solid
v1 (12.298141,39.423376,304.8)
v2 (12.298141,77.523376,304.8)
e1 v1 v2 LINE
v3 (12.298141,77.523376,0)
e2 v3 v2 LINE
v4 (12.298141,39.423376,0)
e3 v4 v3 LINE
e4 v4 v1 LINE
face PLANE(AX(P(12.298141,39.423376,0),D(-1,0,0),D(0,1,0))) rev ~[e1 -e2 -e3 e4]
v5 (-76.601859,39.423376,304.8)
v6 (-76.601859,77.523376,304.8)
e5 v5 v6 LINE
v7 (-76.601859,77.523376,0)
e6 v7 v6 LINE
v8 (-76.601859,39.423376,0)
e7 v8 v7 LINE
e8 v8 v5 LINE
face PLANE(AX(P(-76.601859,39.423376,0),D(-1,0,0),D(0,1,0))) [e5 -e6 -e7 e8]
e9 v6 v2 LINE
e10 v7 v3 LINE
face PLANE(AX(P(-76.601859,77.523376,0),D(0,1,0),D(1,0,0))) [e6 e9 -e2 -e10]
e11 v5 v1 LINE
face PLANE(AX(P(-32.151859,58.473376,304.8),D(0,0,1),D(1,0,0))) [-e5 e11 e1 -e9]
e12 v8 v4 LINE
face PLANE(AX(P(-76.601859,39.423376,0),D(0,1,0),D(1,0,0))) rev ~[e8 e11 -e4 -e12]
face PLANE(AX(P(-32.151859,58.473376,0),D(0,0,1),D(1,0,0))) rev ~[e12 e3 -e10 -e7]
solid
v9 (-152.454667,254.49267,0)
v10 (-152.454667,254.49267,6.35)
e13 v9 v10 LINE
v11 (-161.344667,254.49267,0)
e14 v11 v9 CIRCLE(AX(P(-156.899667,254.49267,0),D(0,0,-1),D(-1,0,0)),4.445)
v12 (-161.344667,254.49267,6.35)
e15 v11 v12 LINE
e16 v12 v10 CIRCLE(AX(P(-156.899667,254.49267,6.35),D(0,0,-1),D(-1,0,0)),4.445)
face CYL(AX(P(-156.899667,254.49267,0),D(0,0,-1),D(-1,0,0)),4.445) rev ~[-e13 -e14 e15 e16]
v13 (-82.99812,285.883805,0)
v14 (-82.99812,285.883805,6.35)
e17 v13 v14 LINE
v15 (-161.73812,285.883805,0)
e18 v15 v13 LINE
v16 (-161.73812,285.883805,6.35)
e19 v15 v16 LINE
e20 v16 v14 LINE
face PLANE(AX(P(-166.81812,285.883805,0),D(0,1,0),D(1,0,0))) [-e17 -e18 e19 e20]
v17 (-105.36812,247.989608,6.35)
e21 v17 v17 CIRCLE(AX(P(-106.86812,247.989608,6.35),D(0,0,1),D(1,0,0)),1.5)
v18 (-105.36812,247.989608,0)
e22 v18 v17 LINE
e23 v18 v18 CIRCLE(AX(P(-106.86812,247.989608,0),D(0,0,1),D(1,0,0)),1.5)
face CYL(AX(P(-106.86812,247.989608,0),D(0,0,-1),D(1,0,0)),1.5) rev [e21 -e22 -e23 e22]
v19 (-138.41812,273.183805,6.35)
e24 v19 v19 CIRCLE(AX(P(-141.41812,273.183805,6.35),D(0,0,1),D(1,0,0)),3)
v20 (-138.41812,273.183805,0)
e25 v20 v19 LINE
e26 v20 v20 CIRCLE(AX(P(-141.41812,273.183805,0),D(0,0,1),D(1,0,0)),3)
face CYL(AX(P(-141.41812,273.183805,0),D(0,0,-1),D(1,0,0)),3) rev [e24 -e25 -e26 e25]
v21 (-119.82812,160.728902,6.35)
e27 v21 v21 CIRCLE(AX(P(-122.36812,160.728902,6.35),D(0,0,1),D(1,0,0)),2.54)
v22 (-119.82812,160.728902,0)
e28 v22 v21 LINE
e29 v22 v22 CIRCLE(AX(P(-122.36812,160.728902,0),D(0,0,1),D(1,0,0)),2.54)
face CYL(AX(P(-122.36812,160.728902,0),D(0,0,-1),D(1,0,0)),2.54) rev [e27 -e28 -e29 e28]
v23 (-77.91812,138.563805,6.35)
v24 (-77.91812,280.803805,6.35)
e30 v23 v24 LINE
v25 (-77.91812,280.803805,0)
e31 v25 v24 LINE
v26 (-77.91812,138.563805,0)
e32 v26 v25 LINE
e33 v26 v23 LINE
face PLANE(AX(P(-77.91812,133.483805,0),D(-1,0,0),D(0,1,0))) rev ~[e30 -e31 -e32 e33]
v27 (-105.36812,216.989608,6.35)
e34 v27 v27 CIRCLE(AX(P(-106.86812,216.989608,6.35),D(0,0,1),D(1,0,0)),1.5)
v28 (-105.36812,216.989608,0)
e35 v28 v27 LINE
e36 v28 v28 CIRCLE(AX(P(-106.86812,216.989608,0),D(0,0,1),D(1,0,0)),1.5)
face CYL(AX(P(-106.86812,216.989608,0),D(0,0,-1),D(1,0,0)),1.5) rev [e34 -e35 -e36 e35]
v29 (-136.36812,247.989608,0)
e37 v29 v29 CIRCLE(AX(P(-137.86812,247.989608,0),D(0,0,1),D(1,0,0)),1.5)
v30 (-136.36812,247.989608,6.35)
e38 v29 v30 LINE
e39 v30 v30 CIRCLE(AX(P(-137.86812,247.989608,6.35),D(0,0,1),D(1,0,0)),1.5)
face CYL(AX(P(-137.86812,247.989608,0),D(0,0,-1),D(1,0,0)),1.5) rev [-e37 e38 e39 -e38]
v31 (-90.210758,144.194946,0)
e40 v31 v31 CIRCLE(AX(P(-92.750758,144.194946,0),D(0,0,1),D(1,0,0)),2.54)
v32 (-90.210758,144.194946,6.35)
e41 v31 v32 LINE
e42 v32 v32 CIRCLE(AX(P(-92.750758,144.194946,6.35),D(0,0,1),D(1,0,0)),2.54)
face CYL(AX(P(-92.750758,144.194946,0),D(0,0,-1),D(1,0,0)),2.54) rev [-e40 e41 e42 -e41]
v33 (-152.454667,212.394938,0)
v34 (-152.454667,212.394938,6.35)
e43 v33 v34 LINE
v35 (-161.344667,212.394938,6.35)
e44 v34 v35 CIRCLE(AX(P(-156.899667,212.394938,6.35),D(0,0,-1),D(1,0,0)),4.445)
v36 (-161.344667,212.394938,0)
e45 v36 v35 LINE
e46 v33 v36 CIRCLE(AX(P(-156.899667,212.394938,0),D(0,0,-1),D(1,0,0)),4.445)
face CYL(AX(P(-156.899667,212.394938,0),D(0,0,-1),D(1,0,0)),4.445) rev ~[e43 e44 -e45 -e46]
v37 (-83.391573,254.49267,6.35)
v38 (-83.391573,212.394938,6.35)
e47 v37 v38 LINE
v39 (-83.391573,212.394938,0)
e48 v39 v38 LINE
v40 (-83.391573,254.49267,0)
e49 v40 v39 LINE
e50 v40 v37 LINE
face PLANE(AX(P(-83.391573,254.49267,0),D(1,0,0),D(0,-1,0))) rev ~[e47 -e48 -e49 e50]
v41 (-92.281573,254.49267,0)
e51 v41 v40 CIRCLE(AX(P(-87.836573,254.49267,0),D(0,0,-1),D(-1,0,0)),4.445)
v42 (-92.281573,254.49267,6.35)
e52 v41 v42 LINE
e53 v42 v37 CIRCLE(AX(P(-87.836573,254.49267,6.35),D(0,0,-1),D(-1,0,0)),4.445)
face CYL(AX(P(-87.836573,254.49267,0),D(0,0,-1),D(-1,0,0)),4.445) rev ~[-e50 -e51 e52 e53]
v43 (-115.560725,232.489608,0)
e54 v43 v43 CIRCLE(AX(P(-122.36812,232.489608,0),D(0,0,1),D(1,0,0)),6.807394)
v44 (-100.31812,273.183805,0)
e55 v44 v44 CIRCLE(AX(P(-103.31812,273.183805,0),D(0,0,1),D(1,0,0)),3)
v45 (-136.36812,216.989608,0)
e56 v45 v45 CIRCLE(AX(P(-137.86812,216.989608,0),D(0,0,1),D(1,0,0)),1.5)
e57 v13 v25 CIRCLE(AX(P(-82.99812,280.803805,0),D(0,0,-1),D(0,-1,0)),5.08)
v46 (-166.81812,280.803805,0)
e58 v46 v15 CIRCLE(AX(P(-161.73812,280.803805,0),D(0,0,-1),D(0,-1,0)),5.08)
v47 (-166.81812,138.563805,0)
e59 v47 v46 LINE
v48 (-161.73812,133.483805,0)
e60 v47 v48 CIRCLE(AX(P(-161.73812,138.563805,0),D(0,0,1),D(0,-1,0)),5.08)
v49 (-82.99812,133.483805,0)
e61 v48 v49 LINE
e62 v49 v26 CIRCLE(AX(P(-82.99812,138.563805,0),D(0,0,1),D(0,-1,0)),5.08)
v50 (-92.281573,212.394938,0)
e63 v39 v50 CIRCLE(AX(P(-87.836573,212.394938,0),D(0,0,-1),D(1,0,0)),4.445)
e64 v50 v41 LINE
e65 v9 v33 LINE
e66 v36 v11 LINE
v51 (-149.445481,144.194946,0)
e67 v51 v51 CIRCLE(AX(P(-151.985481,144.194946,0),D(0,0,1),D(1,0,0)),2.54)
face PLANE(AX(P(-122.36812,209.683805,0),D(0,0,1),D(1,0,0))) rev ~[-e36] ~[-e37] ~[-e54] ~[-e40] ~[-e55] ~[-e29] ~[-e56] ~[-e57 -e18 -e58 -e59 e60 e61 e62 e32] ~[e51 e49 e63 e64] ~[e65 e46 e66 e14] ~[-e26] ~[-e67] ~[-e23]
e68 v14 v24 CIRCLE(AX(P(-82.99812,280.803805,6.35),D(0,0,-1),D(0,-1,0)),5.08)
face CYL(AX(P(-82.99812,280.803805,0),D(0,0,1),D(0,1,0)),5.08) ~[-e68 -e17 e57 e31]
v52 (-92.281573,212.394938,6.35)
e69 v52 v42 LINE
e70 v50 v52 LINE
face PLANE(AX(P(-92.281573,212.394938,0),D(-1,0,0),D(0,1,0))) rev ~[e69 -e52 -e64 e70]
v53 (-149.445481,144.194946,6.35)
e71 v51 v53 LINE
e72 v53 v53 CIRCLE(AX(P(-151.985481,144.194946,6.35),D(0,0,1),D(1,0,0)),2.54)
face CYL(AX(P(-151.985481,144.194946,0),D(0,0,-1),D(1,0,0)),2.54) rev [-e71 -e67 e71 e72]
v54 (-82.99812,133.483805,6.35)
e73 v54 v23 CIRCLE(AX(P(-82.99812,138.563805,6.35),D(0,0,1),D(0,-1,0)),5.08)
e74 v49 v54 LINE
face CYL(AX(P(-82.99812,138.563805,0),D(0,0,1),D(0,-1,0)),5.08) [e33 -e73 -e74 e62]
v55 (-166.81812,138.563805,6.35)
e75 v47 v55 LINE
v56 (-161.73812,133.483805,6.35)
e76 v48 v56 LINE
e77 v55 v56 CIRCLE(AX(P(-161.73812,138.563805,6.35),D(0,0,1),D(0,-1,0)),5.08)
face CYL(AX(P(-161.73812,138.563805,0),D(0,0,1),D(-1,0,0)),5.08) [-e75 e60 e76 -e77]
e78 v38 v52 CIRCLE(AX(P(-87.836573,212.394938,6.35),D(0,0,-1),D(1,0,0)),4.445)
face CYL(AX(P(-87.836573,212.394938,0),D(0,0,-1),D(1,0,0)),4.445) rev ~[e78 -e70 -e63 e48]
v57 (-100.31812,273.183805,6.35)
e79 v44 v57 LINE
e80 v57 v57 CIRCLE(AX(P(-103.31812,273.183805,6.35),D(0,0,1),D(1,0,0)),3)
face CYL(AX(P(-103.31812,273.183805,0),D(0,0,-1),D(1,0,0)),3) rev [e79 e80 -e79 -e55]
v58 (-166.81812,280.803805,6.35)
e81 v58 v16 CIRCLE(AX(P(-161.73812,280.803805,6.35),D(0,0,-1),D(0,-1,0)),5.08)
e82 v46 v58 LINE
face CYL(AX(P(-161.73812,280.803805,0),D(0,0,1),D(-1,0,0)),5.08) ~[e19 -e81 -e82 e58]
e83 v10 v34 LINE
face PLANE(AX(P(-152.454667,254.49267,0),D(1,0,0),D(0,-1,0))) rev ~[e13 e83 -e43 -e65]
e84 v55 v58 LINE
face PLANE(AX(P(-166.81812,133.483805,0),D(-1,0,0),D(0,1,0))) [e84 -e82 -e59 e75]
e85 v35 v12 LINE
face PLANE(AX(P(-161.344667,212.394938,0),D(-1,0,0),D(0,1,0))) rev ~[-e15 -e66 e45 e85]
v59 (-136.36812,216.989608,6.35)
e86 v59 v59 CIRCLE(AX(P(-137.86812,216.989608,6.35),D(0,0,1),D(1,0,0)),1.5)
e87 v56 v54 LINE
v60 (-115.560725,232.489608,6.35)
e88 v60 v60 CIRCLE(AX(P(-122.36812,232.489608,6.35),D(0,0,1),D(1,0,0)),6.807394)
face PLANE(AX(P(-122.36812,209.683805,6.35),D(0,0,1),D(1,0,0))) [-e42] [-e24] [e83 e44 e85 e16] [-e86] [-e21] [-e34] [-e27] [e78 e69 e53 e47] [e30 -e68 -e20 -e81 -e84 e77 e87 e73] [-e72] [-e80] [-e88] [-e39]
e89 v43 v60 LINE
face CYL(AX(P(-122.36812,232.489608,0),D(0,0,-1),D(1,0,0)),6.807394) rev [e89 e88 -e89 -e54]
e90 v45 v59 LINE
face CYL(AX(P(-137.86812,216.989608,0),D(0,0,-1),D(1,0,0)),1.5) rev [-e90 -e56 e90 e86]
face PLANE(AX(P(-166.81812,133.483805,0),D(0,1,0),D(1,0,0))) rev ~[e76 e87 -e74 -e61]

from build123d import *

# Parameters (mm, degrees)
F0_W     = 88.9
F0_H     = 152.4
F0_R     = 2.54
F0_R_2   = 1.5
F0_R_3   = 6.8073941992
F0_R_4   = 3
F1_DEPTH = 6.35
F2_R     = 5.08
F3_W     = 88.9
F3_H     = 38.1
F4_DEPTH = 304.8


# Not quite as in the source:
# - a length typed as a fraction of an inch, garbled in the dataset ("3 / 203.2 mm" for 3/8 in), is restored


with BuildPart() as f1:
    # F0 (on Top) → F1 (new body)
    with BuildSketch(Plane.XY):
        with Locations((-122.368119657, 209.6838048907)):
            Rectangle(F0_W, F0_H)
        with Locations((-151.9854813814, 144.194945693)):
            Circle(F0_R, mode=Mode.SUBTRACT)
        with Locations((-122.368119657, 160.7289016247)):
            Circle(F0_R, mode=Mode.SUBTRACT)
        with Locations((-92.7507579327, 144.194945693)):
            Circle(F0_R, mode=Mode.SUBTRACT)
        with BuildLine():
            Line((-161.3446665764, 212.3949378729), (-161.3446665764, 254.4926702976))
            ThreePointArc((-161.3446665764, 254.4926702976), (-156.8996665764, 258.9376702976), (-152.4546665764, 254.4926702976))
            Line((-152.4546665764, 254.4926702976), (-152.4546665764, 212.3949378729))
            ThreePointArc((-152.4546665764, 212.3949378729), (-156.8996665764, 207.9499378729), (-161.3446665764, 212.3949378729))
        make_face(mode=Mode.SUBTRACT)
        with Locations((-137.868119657, 216.9896082271)):
            Circle(F0_R_2, mode=Mode.SUBTRACT)
        with Locations((-122.368119657, 232.4896082271)):
            Circle(F0_R_3, mode=Mode.SUBTRACT)
        with Locations((-137.868119657, 247.9896082271)):
            Circle(F0_R_2, mode=Mode.SUBTRACT)
        with Locations((-141.418119657, 273.1838048907)):
            Circle(F0_R_4, mode=Mode.SUBTRACT)
        with Locations((-106.868119657, 216.9896082271)):
            Circle(F0_R_2, mode=Mode.SUBTRACT)
        with BuildLine():
            Line((-92.2815727377, 212.3949378729), (-92.2815727377, 254.4926702976))
            ThreePointArc((-92.2815727377, 254.4926702976), (-87.8365727377, 258.9376702976), (-83.3915727377, 254.4926702976))
            Line((-83.3915727377, 254.4926702976), (-83.3915727377, 212.3949378729))
            ThreePointArc((-83.3915727377, 212.3949378729), (-87.8365727377, 207.9499378729), (-92.2815727377, 212.3949378729))
        make_face(mode=Mode.SUBTRACT)
        with Locations((-106.868119657, 247.9896082271)):
            Circle(F0_R_2, mode=Mode.SUBTRACT)
        with Locations((-103.318119657, 273.1838048907)):
            Circle(F0_R_4, mode=Mode.SUBTRACT)
    extrude(amount=F1_DEPTH)

    # F2
    f2_edges = [f1.edges().sort_by_distance(p)[0] for p in [
        (-77.91812, 285.883805, 3.175),
        (-166.81812, 285.883805, 3.175),
        (-77.91812, 133.483805, 3.175),
        (-166.81812, 133.483805, 3.175),
    ]]
    fillet(f2_edges, radius=F2_R)


with BuildPart() as f4:
    # F3 (on Top) → F4 (new body)
    with BuildSketch(Plane.XY):
        with Locations((-32.1518591821, 58.4733763218)):
            Rectangle(F3_W, F3_H)
    extrude(amount=F4_DEPTH)


solid = Compound([f1.part, f4.part])
